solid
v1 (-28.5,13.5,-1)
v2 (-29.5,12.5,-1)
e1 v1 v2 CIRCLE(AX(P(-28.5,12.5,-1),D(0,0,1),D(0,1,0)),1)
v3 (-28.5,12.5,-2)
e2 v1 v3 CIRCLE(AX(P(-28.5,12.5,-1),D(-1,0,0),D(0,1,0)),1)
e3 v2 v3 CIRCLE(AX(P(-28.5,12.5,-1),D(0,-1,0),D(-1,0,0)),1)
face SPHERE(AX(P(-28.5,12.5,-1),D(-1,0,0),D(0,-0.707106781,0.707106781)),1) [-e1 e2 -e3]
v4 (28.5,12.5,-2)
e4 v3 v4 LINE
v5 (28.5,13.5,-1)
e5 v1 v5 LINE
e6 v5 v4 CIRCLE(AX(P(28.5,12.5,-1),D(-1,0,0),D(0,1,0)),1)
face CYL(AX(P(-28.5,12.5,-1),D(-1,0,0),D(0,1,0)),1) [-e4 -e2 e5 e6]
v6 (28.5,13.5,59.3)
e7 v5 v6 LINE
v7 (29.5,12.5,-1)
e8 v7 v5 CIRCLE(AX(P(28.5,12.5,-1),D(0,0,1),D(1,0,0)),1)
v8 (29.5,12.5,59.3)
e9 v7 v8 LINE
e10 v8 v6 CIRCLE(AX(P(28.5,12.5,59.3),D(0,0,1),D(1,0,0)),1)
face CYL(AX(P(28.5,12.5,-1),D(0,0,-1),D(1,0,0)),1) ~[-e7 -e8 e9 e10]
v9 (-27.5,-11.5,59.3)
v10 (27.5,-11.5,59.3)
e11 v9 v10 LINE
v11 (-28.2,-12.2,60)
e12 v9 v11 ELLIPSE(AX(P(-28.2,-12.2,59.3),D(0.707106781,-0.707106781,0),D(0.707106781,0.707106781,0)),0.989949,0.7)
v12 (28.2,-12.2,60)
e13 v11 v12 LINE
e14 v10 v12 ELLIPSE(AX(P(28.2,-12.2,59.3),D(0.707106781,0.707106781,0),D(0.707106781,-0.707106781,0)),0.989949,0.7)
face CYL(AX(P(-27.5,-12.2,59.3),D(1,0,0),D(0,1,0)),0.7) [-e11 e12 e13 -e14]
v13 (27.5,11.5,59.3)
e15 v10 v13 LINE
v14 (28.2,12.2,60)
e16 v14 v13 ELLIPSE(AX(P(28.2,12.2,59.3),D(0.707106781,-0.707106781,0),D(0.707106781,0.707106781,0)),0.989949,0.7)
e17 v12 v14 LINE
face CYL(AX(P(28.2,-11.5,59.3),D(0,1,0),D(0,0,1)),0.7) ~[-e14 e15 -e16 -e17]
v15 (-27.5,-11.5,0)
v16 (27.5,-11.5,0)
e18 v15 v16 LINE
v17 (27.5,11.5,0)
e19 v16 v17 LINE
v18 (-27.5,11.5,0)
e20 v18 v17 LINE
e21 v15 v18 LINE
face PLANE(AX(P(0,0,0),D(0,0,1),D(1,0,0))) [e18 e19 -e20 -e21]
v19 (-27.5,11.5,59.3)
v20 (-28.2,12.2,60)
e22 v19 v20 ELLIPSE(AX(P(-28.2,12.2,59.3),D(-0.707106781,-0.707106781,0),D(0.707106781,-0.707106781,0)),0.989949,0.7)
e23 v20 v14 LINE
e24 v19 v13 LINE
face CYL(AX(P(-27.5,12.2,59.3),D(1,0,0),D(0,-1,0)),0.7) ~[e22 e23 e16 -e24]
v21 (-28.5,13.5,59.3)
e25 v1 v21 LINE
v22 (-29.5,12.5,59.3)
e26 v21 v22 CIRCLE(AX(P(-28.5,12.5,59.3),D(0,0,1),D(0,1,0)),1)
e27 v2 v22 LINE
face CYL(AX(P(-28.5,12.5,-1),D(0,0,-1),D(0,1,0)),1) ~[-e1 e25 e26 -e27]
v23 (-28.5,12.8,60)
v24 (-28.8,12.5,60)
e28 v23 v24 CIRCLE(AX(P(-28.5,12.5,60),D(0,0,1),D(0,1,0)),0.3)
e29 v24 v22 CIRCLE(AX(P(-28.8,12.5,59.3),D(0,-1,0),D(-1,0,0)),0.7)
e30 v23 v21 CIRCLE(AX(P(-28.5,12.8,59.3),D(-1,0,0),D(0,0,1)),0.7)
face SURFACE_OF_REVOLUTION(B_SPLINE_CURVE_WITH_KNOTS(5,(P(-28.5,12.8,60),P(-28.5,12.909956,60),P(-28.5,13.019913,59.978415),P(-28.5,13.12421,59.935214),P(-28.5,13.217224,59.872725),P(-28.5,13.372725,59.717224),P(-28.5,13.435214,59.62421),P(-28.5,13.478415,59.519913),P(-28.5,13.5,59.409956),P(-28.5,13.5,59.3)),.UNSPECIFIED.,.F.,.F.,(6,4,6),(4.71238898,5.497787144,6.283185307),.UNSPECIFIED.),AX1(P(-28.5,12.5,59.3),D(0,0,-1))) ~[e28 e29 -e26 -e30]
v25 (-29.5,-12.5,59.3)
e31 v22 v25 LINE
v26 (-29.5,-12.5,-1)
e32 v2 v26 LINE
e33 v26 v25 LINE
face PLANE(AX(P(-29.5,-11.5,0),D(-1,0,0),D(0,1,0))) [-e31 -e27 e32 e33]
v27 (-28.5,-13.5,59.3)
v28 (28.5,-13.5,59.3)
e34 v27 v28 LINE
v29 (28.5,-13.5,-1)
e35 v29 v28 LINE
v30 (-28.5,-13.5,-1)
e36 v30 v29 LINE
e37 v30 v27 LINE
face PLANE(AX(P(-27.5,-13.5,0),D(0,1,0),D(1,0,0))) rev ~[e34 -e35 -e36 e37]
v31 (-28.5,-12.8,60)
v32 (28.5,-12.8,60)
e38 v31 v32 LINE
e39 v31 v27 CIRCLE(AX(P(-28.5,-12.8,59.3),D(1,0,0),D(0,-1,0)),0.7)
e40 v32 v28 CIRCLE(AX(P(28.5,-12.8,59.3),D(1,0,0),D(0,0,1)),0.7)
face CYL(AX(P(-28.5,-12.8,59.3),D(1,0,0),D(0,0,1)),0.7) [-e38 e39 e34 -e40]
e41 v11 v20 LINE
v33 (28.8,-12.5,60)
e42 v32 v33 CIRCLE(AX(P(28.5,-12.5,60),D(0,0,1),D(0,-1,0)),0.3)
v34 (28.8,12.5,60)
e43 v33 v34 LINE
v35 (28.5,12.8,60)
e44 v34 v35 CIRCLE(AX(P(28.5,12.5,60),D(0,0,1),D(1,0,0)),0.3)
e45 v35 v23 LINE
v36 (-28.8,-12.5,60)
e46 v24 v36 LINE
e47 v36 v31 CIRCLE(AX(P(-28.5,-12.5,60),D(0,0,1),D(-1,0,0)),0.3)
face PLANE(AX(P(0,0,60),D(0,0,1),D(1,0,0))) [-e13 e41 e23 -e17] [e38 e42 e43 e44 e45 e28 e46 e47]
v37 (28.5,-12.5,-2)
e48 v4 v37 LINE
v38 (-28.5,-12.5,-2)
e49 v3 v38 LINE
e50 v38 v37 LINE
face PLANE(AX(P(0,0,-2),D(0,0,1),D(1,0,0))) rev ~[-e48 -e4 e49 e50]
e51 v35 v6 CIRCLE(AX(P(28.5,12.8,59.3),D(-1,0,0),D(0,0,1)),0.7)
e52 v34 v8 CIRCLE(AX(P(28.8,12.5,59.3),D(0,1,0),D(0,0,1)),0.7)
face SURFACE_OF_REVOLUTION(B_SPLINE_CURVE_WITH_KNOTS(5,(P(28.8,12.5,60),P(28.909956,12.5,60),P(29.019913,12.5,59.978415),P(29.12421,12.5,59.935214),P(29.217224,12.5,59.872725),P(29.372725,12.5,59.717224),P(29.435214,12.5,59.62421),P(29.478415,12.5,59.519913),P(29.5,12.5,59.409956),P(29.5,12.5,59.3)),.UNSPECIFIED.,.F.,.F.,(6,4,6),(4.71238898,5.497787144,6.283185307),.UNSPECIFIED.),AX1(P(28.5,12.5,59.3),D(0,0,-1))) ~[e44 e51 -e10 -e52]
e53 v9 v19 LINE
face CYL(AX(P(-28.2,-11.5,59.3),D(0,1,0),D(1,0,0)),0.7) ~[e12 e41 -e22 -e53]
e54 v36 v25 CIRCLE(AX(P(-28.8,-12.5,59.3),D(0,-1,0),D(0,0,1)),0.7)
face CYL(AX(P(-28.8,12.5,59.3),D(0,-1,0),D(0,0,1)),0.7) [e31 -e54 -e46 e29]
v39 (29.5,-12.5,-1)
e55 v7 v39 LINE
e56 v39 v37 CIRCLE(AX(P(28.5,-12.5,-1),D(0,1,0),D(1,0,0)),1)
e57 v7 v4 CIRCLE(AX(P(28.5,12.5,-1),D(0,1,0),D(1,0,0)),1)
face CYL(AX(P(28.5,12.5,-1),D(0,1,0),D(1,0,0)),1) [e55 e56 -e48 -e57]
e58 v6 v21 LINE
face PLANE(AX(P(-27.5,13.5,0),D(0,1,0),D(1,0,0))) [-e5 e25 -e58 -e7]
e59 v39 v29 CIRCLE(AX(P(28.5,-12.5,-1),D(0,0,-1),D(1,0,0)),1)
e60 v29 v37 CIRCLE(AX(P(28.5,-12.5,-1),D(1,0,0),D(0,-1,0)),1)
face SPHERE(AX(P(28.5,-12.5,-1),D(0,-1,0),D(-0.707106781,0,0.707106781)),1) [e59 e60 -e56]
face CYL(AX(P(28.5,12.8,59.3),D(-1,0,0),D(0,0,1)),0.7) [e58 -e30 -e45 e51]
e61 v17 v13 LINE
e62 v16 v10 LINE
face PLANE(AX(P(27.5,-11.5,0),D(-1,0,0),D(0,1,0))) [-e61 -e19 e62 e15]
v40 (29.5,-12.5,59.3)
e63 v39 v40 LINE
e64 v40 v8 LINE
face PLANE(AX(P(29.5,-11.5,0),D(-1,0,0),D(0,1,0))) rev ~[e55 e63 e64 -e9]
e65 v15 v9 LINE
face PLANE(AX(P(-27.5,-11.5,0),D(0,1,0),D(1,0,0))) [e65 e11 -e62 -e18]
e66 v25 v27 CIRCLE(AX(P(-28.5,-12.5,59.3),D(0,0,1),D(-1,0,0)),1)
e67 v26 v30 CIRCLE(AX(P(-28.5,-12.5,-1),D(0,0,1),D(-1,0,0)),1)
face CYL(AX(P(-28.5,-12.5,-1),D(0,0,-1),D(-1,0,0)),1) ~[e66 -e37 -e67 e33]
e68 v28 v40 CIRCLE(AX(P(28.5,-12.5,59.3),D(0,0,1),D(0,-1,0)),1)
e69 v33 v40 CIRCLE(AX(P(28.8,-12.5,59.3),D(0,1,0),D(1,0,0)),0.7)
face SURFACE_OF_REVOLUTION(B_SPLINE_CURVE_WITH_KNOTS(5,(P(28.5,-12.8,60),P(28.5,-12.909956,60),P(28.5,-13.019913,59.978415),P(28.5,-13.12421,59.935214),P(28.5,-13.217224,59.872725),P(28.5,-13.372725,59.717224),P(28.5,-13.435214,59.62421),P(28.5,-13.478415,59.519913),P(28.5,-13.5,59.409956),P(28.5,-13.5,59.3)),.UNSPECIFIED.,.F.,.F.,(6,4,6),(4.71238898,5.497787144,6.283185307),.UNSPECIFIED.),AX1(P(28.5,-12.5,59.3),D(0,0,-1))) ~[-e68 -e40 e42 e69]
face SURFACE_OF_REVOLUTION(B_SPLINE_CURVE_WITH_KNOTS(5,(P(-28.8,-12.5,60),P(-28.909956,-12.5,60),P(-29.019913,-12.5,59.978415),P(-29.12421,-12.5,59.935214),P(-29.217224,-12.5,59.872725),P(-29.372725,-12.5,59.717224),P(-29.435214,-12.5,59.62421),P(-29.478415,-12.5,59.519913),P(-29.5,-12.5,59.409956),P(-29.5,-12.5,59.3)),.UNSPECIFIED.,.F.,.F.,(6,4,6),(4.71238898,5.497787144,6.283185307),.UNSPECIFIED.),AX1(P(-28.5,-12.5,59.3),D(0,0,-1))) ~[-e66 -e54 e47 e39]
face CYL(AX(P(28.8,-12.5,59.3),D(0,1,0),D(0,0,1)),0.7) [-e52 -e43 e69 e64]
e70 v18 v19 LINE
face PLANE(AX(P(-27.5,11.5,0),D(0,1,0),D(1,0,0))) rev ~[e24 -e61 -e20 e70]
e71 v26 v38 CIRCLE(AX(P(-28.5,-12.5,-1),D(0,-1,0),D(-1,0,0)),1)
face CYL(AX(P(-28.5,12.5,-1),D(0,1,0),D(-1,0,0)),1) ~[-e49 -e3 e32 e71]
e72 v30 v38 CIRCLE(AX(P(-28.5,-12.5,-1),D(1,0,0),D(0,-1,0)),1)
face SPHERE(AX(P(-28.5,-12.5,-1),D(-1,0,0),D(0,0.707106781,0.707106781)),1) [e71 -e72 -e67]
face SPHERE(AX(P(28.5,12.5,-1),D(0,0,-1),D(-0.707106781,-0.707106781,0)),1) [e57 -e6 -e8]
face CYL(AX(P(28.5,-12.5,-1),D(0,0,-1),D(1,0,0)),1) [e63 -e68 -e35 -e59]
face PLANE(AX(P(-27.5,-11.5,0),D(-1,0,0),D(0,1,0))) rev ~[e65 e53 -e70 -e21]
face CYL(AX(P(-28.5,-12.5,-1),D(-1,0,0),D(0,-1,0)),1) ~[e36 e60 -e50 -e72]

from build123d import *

# Parameters (mm, degrees)
F0_W         = 55
F0_H         = 23
F1_DEPTH     = 60
F2_T         = 2
F3_T1_DEPTH  = 63.5
F3_T3_DEPTH  = 25
F3_T5_DEPTH  = 57
F3_S9_W      = 1
F3_S9_H      = 1
F3_T10_DEPTH = 1
F3_S15_W     = 1
F3_S15_H     = 1
F3_T16_DEPTH = 1
F3_S21_W     = 1
F3_S21_H     = 1
F3_T22_DEPTH = 1
F3_S27_W     = 1
F3_S27_H     = 1
F3_T28_DEPTH = 1
F4_R         = 0.7


# Not quite as in the source:
# - a fillet or chamfer that OpenCascade refuses, or shapes differently, is made with other operations: its cross-section is extruded or revolved along the edge and cut away or added


with BuildPart() as f1:
    # F0 (on Top) → F1 (new body)
    with BuildSketch(Plane.XY):
        Rectangle(F0_W, F0_H)
    extrude(amount=F1_DEPTH)

    # F2
    f2_openings = [f1.faces().sort_by_distance(p)[0] for p in [
        (0, 0, 60),
    ]]
    offset(amount=F2_T, openings=f2_openings, kind=Kind.INTERSECTION)

    # F3: fillet of radius 1 on 8 edges, made by hand

    # F3_s2 → F3_t1 (cut)
    with BuildSketch(Plane.XY.offset(-1)):
        with BuildLine():
            ThreePointArc((29.5, -12.5), (29.2071067812, -13.2071067812), (28.5, -13.5))
            Line((28.5, -13.5), (29.5, -13.5))
            Line((29.5, -13.5), (29.5, -12.5))
        make_face()
        with BuildLine():
            ThreePointArc((29.5, 12.5), (29.2071067812, 13.2071067812), (28.5, 13.5))
            Line((28.5, 13.5), (29.5, 13.5))
            Line((29.5, 13.5), (29.5, 12.5))
        make_face()
        with BuildLine():
            ThreePointArc((-28.5, 13.5), (-29.2071067812, 13.2071067812), (-29.5, 12.5))
            Line((-29.5, 12.5), (-29.5, 13.5))
            Line((-29.5, 13.5), (-28.5, 13.5))
        make_face()
        with BuildLine():
            ThreePointArc((-29.5, -12.5), (-29.2071067812, -13.2071067812), (-28.5, -13.5))
            Line((-28.5, -13.5), (-29.5, -13.5))
            Line((-29.5, -13.5), (-29.5, -12.5))
        make_face()
    extrude(amount=F3_T1_DEPTH, mode=Mode.SUBTRACT)

    # F3_s4 → F3_t3 (cut)
    with BuildSketch(Plane.XZ.offset(-12.5)):
        with BuildLine():
            ThreePointArc((29.5, -1), (29.2071067812, -1.7071067812), (28.5, -2))
            Line((28.5, -2), (29.5, -2))
            Line((29.5, -2), (29.5, -1))
        make_face()
        with BuildLine():
            ThreePointArc((-29.5, -1), (-29.2071067812, -1.7071067812), (-28.5, -2))
            Line((-28.5, -2), (-29.5, -2))
            Line((-29.5, -2), (-29.5, -1))
        make_face()
    extrude(amount=F3_T3_DEPTH, mode=Mode.SUBTRACT)

    # F3_s6 → F3_t5 (cut)
    with BuildSketch(Plane.YZ.offset(-28.5)):
        with BuildLine():
            ThreePointArc((13.5, -1), (13.2071067812, -1.7071067812), (12.5, -2))
            Line((12.5, -2), (13.5, -2))
            Line((13.5, -2), (13.5, -1))
        make_face()
        with BuildLine():
            ThreePointArc((-13.5, -1), (-13.2071067812, -1.7071067812), (-12.5, -2))
            Line((-12.5, -2), (-13.5, -2))
            Line((-13.5, -2), (-13.5, -1))
        make_face()
    extrude(amount=F3_T5_DEPTH, mode=Mode.SUBTRACT)


with BuildPart() as f3_tool8:
    # F3_s9 → F3_t10 (new body)
    with BuildSketch(Plane.XZ.offset(12.5)):
        with Locations((29, -1.5)):
            Rectangle(F3_S9_W, F3_S9_H)
    extrude(amount=F3_T10_DEPTH)

    # F3_s11 → F3_t12 (revolve, cut)
    with BuildSketch(Plane(origin=(28.5, -12.5, -1), x_dir=(-0.7071067812, 0, 0.7071067812), z_dir=(0.7071067812, 0, 0.7071067812))):
        with BuildLine():
            ThreePointArc((0, -1), (1, 0), (0, 1))
            Line((0, 1), (0, -1))
        make_face()
    revolve(axis=Axis((28.5, -12.5, -1), (0, -1, 0)), mode=Mode.SUBTRACT)


with BuildPart() as f1_1:
    add(f1.part)

    # F3_t7: cut F3_tool8
    add(f3_tool8.part, mode=Mode.SUBTRACT)


with BuildPart() as f3_tool14:
    # F3_s15 → F3_t16 (new body)
    with BuildSketch(Plane.XY.offset(-1)):
        with Locations((29, 13)):
            Rectangle(F3_S15_W, F3_S15_H)
    extrude(amount=-F3_T16_DEPTH)

    # F3_s17 → F3_t18 (revolve, cut)
    with BuildSketch(Plane(origin=(28.5, 12.5, -1), x_dir=(-0.7071067812, -0.7071067812, 0), z_dir=(0.7071067812, -0.7071067812, 0))):
        with BuildLine():
            ThreePointArc((0, -1), (1, 0), (0, 1))
            Line((0, 1), (0, -1))
        make_face()
    revolve(axis=Axis((28.5, 12.5, -1), (0, 0, -1)), mode=Mode.SUBTRACT)


with BuildPart() as f1_2:
    add(f1_1.part)

    # F3_t13: cut F3_tool14
    add(f3_tool14.part, mode=Mode.SUBTRACT)


with BuildPart() as f3_tool20:
    # F3_s21 → F3_t22 (new body)
    with BuildSketch(Plane.YZ.offset(-28.5)):
        with Locations((13, -1.5)):
            Rectangle(F3_S21_W, F3_S21_H)
    extrude(amount=-F3_T22_DEPTH)

    # F3_s23 → F3_t24 (revolve, cut)
    with BuildSketch(Plane(origin=(-28.5, 12.5, -1), x_dir=(0, -0.7071067812, 0.7071067812), z_dir=(0, -0.7071067812, -0.7071067812))):
        with BuildLine():
            ThreePointArc((0, -1), (1, 0), (0, 1))
            Line((0, 1), (0, -1))
        make_face()
    revolve(axis=Axis((-28.5, 12.5, -1), (-1, 0, 0)), mode=Mode.SUBTRACT)


with BuildPart() as f1_3:
    add(f1_2.part)

    # F3_t19: cut F3_tool20
    add(f3_tool20.part, mode=Mode.SUBTRACT)


with BuildPart() as f3_tool26:
    # F3_s27 → F3_t28 (new body)
    with BuildSketch(Plane.YZ.offset(-28.5)):
        with Locations((-13, -1.5)):
            Rectangle(F3_S27_W, F3_S27_H)
    extrude(amount=-F3_T28_DEPTH)

    # F3_s29 → F3_t30 (revolve, cut)
    with BuildSketch(Plane(origin=(-28.5, -12.5, -1), x_dir=(0, 0.7071067812, 0.7071067812), z_dir=(0, -0.7071067812, 0.7071067812))):
        with BuildLine():
            ThreePointArc((0, -1), (1, 0), (0, 1))
            Line((0, 1), (0, -1))
        make_face()
    revolve(axis=Axis((-28.5, -12.5, -1), (-1, 0, 0)), mode=Mode.SUBTRACT)


with BuildPart() as f1_4:
    add(f1_3.part)

    # F3_t25: cut F3_tool26
    add(f3_tool26.part, mode=Mode.SUBTRACT)

    # F4
    f4_edges = [f1_4.edges().sort_by_distance(p)[0] for p in [
        (0, -11.5, 60),
        (27.5, 0, 60),
        (0, 11.5, 60),
        (-27.5, 0, 60),
        (0, 13.5, 60),
        (0, -13.5, 60),
        (-29.5, 0, 60),
        (29.5, 0, 60),
        (-29.207107, 13.207107, 60),
        (29.207107, 13.207107, 60),
        (29.207107, -13.207107, 60),
        (-29.207107, -13.207107, 60),
    ]]
    fillet(f4_edges, radius=F4_R)


solid = f1_4.part
